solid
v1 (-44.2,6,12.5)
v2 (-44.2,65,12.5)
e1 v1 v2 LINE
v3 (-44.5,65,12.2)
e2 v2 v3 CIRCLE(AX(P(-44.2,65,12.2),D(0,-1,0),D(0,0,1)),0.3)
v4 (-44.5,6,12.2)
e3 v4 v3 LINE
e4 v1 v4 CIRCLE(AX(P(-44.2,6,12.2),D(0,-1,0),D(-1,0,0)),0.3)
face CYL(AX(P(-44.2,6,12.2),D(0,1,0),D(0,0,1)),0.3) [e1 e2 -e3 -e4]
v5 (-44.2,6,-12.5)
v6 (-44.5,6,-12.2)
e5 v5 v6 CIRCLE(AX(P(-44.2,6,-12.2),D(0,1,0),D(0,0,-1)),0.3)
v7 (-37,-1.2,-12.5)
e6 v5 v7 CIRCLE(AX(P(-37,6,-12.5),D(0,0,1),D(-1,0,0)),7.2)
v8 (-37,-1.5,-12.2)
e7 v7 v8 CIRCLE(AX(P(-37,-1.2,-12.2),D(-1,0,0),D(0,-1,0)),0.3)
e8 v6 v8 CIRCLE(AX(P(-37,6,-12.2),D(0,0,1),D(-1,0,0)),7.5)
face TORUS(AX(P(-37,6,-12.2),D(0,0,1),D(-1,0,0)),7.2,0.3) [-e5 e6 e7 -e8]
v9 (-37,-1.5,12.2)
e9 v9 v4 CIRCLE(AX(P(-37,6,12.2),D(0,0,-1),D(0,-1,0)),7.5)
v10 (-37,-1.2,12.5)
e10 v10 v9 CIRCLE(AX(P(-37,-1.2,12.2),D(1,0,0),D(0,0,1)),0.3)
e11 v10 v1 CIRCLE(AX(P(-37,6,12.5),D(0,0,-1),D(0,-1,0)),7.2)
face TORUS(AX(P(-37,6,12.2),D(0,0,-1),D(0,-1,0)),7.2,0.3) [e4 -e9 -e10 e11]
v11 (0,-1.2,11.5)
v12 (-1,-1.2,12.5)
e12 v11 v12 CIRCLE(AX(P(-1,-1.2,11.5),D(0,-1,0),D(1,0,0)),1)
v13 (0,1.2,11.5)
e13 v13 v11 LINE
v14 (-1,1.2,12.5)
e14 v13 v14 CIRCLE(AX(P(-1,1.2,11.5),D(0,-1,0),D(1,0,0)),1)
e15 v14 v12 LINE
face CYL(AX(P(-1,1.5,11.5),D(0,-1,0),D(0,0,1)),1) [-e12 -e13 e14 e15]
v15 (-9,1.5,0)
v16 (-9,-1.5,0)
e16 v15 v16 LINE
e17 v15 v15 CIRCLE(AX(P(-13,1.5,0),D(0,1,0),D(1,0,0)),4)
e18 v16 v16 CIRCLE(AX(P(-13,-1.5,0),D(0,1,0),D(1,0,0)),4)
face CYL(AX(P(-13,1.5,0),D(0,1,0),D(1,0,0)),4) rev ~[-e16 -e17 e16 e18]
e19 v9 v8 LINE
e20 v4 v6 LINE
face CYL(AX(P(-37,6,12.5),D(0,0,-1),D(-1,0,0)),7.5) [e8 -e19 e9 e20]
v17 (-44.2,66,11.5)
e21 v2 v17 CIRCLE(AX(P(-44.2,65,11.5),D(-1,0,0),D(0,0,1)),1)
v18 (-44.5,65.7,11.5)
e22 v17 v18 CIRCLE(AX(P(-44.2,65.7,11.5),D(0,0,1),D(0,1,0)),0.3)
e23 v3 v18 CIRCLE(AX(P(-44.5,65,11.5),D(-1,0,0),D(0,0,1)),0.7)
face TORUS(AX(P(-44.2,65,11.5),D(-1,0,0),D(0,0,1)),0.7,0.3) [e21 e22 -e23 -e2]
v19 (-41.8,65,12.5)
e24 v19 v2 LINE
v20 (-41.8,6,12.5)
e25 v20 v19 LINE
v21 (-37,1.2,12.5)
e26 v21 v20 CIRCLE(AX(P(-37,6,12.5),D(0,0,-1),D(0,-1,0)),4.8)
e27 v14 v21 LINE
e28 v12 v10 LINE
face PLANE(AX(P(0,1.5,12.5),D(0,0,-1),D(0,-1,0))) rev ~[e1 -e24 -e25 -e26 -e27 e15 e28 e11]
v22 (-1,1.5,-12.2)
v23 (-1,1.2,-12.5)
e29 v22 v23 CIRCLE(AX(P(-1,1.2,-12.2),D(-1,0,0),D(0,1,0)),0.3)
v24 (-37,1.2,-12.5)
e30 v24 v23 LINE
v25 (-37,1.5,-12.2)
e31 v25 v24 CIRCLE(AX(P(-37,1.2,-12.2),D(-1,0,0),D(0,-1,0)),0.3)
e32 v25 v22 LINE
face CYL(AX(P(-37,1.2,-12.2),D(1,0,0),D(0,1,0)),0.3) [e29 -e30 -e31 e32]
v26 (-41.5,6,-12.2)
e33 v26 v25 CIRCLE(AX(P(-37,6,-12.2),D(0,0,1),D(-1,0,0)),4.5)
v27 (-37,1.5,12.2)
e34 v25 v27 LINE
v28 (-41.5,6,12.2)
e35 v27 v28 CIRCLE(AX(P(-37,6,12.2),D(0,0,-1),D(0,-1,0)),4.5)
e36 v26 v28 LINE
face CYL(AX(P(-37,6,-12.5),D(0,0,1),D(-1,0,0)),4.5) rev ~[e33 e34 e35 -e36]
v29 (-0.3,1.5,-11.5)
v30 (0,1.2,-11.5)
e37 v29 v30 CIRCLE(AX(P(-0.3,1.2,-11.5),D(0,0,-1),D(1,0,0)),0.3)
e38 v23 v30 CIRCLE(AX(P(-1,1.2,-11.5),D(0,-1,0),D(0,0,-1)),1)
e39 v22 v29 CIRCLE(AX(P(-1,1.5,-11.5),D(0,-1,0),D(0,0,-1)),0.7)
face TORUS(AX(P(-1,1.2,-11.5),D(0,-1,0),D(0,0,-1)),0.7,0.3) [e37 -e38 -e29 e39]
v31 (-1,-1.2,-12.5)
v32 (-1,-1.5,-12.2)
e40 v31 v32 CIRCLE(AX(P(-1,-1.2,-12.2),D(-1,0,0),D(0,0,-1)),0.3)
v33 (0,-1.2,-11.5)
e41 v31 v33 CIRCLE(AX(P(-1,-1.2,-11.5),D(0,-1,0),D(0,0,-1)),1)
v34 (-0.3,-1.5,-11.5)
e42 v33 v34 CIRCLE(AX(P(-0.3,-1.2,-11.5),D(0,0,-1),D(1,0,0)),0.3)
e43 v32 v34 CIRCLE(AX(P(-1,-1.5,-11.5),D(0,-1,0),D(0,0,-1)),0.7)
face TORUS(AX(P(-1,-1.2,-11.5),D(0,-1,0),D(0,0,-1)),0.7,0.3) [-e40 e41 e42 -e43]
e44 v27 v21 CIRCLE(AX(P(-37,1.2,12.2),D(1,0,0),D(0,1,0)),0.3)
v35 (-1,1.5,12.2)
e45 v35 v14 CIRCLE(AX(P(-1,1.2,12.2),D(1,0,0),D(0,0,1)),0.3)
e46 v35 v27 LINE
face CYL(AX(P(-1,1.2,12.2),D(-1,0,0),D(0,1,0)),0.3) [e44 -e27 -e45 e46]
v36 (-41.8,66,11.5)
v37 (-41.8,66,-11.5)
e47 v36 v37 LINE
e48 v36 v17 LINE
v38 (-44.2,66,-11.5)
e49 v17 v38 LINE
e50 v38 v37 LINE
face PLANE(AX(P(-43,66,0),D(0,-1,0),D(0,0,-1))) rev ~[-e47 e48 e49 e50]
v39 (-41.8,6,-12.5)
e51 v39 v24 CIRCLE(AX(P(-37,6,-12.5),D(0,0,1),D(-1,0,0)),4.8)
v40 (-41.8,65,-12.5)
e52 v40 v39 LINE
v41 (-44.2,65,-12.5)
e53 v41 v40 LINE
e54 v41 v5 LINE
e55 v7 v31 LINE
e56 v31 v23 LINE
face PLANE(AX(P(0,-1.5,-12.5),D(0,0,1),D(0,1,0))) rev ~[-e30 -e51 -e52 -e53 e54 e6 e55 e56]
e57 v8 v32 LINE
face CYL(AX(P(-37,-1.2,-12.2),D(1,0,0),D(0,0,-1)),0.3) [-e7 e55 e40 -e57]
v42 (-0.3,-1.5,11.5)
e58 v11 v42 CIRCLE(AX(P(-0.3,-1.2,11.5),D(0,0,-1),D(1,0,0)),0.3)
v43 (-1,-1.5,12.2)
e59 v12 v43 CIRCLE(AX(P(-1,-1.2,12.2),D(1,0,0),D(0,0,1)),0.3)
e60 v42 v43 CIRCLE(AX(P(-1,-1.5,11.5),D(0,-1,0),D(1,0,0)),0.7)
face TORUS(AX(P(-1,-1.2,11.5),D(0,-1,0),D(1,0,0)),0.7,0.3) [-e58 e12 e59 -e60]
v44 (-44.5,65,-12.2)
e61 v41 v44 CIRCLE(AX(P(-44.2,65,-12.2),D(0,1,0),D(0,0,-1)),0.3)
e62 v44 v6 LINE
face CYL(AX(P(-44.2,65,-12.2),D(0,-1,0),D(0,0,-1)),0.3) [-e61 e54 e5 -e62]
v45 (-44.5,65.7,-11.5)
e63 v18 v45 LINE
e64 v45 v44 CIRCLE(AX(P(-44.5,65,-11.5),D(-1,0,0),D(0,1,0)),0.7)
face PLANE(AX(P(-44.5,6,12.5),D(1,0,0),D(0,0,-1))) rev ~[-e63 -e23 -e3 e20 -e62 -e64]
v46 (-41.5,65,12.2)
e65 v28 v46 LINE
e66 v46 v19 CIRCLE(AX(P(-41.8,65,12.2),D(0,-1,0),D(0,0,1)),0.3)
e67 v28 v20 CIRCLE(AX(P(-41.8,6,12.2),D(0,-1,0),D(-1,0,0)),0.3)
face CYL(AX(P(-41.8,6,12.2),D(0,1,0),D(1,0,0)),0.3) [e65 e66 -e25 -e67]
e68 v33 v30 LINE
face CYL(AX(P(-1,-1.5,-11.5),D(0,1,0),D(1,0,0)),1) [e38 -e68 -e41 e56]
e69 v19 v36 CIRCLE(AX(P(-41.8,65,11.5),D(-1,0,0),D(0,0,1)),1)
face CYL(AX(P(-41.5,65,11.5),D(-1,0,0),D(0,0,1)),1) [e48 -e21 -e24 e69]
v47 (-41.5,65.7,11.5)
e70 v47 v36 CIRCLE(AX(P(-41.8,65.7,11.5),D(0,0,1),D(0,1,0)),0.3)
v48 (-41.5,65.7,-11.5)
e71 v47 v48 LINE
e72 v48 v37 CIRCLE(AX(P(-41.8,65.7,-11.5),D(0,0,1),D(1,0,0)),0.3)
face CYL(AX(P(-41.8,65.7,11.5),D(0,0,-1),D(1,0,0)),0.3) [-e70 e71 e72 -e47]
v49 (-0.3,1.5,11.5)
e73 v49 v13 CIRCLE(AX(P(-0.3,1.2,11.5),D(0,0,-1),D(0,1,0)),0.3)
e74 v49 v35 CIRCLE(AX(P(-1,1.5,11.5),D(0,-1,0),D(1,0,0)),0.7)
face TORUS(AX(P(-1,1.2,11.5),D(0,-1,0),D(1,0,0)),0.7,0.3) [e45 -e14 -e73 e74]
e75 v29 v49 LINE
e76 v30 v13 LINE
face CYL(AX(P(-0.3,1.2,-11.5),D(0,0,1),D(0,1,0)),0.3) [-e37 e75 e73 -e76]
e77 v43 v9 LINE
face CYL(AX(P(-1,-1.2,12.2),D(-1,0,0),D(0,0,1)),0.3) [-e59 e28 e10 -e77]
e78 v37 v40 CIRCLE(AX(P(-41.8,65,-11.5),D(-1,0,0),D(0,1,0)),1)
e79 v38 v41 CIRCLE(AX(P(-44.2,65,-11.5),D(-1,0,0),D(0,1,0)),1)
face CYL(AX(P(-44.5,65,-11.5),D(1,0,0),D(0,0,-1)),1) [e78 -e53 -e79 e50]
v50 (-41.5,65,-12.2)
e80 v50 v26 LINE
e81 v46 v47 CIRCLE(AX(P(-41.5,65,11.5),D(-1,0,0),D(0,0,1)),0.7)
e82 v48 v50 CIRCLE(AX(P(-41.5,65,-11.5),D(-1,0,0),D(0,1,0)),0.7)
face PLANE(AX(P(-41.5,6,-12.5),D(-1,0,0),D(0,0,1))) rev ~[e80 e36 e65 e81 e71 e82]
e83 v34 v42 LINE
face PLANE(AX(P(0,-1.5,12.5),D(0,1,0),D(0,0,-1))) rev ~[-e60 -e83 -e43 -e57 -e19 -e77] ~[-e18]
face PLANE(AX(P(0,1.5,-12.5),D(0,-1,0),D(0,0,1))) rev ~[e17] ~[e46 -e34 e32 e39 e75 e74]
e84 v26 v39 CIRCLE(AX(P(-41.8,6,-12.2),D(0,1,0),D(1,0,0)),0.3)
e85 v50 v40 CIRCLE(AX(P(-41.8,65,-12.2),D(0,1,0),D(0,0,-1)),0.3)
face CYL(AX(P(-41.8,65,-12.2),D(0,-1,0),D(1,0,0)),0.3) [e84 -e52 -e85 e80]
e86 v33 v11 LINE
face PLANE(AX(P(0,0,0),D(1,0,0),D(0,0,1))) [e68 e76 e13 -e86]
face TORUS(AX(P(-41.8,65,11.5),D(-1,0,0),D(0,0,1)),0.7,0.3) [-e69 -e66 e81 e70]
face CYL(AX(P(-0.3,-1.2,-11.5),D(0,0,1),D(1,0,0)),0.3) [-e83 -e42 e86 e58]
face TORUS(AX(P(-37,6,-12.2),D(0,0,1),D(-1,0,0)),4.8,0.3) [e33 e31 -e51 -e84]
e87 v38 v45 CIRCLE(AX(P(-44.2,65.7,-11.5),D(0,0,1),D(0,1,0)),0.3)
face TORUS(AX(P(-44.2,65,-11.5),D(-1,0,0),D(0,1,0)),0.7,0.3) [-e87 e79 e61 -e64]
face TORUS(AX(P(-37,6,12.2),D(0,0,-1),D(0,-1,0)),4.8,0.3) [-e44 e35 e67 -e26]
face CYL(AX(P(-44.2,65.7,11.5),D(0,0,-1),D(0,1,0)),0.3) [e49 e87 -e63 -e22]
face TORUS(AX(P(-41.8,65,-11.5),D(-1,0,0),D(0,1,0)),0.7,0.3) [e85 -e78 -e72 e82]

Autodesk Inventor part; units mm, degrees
ref_plane "YZ Plane" through (0, 0, 0) normal (1, 0, 0) x (0, 1, 0)
ref_plane "XZ Plane" through (0, 0, 0) normal (0, 1, 0) x (-1, 0, 0)
ref_plane "XY Plane" through (0, 0, 0) normal (0, 0, 1) x (1, 0, 0)
sketch "Sketch1" plane through (0, 0, 0) normal (0, 0, 1) x (1, 0, 0)
  line L0 (0, 0) -> (-37, 0)
  line L1 (-43, 6) -> (-43, 66)
  arc A0 (-43, 6) -> (-37, 0) centre (-37, 6) ccw
  point P0 (-43, 0)
  dimension "d0" = 43
  dimension "d1" = 66
  dimension "d2" = 6
sketch "Sketch2" plane through (0, 0, 0) normal (1, 0, 0) x (0, 1, 0)
  line L0 (-1.5, -12.5) -> (1.5, -12.5)
  line L1 (1.5, -12.5) -> (1.5, 12.5)
  line L2 (1.5, 12.5) -> (-1.5, 12.5)
  line L3 (-1.5, 12.5) -> (-1.5, -12.5)
  line L4 (-1.5, -12.5) -> (1.5, 12.5) construction
  line L5 (1.5, -12.5) -> (-1.5, 12.5) construction
  point P0 (0, 0)
  dimension "d3" = 3
  dimension "d4" = 25
sweep "Sweep1" add profiles "Sketch2" path "Sketch1"
sketch "Sketch3" plane through (0, 1.5, 12.5) normal (0, 1, 0) x (1, 0, 0)
  circle A0 centre (-13, 12.5) radius 4
  line L0 (0, 25) -> (0, 0) projected
  point P0 (0, 12.5)
  point P1 (0, 12.5)
  point P2 (0, 12.5)
  dimension "d7" = 8
  dimension "d8" = 13
extrude "Extrusion1" cut sketch "Sketch3" against normal through all
thread "Thread1"
fillet "Fillet1" radius 1 4 edges at (-43, 66, 12.5) (0, 0, 12.5) (0, 0, -12.5) (-43, 66, -12.5)
fillet "Fillet2" radius 0.3 24 edges at (-44.5, 65.7071, 12.2071) (-44.5, 66, 0) (-44.5, 65.7071, -12.2071) (-19, -1.5, -12.5) (-42.3033, 0.6967, -12.5) (-44.5, 35.5, -12.5) (-0.2929, -1.5, -12.2071) (0, -1.5, 0) (-0.2929, -1.5, 12.2071) (-19, -1.5, 12.5) (-42.3033, 0.6967, 12.5) (-44.5, 35.5, 12.5) (-41.5, 65.7071, 12.2071) (-41.5, 66, 0) (-41.5, 65.7071, -12.2071) (-19, 1.5, -12.5) (-40.182, 2.818, -12.5) (-41.5, 35.5, -12.5) (-0.2929, 1.5, -12.2071) (0, 1.5, 0) (-0.2929, 1.5, 12.2071) (-19, 1.5, 12.5) (-40.182, 2.818, 12.5) (-41.5, 35.5, 12.5)
properties part number "clampBaseBottom" material "Steel"
